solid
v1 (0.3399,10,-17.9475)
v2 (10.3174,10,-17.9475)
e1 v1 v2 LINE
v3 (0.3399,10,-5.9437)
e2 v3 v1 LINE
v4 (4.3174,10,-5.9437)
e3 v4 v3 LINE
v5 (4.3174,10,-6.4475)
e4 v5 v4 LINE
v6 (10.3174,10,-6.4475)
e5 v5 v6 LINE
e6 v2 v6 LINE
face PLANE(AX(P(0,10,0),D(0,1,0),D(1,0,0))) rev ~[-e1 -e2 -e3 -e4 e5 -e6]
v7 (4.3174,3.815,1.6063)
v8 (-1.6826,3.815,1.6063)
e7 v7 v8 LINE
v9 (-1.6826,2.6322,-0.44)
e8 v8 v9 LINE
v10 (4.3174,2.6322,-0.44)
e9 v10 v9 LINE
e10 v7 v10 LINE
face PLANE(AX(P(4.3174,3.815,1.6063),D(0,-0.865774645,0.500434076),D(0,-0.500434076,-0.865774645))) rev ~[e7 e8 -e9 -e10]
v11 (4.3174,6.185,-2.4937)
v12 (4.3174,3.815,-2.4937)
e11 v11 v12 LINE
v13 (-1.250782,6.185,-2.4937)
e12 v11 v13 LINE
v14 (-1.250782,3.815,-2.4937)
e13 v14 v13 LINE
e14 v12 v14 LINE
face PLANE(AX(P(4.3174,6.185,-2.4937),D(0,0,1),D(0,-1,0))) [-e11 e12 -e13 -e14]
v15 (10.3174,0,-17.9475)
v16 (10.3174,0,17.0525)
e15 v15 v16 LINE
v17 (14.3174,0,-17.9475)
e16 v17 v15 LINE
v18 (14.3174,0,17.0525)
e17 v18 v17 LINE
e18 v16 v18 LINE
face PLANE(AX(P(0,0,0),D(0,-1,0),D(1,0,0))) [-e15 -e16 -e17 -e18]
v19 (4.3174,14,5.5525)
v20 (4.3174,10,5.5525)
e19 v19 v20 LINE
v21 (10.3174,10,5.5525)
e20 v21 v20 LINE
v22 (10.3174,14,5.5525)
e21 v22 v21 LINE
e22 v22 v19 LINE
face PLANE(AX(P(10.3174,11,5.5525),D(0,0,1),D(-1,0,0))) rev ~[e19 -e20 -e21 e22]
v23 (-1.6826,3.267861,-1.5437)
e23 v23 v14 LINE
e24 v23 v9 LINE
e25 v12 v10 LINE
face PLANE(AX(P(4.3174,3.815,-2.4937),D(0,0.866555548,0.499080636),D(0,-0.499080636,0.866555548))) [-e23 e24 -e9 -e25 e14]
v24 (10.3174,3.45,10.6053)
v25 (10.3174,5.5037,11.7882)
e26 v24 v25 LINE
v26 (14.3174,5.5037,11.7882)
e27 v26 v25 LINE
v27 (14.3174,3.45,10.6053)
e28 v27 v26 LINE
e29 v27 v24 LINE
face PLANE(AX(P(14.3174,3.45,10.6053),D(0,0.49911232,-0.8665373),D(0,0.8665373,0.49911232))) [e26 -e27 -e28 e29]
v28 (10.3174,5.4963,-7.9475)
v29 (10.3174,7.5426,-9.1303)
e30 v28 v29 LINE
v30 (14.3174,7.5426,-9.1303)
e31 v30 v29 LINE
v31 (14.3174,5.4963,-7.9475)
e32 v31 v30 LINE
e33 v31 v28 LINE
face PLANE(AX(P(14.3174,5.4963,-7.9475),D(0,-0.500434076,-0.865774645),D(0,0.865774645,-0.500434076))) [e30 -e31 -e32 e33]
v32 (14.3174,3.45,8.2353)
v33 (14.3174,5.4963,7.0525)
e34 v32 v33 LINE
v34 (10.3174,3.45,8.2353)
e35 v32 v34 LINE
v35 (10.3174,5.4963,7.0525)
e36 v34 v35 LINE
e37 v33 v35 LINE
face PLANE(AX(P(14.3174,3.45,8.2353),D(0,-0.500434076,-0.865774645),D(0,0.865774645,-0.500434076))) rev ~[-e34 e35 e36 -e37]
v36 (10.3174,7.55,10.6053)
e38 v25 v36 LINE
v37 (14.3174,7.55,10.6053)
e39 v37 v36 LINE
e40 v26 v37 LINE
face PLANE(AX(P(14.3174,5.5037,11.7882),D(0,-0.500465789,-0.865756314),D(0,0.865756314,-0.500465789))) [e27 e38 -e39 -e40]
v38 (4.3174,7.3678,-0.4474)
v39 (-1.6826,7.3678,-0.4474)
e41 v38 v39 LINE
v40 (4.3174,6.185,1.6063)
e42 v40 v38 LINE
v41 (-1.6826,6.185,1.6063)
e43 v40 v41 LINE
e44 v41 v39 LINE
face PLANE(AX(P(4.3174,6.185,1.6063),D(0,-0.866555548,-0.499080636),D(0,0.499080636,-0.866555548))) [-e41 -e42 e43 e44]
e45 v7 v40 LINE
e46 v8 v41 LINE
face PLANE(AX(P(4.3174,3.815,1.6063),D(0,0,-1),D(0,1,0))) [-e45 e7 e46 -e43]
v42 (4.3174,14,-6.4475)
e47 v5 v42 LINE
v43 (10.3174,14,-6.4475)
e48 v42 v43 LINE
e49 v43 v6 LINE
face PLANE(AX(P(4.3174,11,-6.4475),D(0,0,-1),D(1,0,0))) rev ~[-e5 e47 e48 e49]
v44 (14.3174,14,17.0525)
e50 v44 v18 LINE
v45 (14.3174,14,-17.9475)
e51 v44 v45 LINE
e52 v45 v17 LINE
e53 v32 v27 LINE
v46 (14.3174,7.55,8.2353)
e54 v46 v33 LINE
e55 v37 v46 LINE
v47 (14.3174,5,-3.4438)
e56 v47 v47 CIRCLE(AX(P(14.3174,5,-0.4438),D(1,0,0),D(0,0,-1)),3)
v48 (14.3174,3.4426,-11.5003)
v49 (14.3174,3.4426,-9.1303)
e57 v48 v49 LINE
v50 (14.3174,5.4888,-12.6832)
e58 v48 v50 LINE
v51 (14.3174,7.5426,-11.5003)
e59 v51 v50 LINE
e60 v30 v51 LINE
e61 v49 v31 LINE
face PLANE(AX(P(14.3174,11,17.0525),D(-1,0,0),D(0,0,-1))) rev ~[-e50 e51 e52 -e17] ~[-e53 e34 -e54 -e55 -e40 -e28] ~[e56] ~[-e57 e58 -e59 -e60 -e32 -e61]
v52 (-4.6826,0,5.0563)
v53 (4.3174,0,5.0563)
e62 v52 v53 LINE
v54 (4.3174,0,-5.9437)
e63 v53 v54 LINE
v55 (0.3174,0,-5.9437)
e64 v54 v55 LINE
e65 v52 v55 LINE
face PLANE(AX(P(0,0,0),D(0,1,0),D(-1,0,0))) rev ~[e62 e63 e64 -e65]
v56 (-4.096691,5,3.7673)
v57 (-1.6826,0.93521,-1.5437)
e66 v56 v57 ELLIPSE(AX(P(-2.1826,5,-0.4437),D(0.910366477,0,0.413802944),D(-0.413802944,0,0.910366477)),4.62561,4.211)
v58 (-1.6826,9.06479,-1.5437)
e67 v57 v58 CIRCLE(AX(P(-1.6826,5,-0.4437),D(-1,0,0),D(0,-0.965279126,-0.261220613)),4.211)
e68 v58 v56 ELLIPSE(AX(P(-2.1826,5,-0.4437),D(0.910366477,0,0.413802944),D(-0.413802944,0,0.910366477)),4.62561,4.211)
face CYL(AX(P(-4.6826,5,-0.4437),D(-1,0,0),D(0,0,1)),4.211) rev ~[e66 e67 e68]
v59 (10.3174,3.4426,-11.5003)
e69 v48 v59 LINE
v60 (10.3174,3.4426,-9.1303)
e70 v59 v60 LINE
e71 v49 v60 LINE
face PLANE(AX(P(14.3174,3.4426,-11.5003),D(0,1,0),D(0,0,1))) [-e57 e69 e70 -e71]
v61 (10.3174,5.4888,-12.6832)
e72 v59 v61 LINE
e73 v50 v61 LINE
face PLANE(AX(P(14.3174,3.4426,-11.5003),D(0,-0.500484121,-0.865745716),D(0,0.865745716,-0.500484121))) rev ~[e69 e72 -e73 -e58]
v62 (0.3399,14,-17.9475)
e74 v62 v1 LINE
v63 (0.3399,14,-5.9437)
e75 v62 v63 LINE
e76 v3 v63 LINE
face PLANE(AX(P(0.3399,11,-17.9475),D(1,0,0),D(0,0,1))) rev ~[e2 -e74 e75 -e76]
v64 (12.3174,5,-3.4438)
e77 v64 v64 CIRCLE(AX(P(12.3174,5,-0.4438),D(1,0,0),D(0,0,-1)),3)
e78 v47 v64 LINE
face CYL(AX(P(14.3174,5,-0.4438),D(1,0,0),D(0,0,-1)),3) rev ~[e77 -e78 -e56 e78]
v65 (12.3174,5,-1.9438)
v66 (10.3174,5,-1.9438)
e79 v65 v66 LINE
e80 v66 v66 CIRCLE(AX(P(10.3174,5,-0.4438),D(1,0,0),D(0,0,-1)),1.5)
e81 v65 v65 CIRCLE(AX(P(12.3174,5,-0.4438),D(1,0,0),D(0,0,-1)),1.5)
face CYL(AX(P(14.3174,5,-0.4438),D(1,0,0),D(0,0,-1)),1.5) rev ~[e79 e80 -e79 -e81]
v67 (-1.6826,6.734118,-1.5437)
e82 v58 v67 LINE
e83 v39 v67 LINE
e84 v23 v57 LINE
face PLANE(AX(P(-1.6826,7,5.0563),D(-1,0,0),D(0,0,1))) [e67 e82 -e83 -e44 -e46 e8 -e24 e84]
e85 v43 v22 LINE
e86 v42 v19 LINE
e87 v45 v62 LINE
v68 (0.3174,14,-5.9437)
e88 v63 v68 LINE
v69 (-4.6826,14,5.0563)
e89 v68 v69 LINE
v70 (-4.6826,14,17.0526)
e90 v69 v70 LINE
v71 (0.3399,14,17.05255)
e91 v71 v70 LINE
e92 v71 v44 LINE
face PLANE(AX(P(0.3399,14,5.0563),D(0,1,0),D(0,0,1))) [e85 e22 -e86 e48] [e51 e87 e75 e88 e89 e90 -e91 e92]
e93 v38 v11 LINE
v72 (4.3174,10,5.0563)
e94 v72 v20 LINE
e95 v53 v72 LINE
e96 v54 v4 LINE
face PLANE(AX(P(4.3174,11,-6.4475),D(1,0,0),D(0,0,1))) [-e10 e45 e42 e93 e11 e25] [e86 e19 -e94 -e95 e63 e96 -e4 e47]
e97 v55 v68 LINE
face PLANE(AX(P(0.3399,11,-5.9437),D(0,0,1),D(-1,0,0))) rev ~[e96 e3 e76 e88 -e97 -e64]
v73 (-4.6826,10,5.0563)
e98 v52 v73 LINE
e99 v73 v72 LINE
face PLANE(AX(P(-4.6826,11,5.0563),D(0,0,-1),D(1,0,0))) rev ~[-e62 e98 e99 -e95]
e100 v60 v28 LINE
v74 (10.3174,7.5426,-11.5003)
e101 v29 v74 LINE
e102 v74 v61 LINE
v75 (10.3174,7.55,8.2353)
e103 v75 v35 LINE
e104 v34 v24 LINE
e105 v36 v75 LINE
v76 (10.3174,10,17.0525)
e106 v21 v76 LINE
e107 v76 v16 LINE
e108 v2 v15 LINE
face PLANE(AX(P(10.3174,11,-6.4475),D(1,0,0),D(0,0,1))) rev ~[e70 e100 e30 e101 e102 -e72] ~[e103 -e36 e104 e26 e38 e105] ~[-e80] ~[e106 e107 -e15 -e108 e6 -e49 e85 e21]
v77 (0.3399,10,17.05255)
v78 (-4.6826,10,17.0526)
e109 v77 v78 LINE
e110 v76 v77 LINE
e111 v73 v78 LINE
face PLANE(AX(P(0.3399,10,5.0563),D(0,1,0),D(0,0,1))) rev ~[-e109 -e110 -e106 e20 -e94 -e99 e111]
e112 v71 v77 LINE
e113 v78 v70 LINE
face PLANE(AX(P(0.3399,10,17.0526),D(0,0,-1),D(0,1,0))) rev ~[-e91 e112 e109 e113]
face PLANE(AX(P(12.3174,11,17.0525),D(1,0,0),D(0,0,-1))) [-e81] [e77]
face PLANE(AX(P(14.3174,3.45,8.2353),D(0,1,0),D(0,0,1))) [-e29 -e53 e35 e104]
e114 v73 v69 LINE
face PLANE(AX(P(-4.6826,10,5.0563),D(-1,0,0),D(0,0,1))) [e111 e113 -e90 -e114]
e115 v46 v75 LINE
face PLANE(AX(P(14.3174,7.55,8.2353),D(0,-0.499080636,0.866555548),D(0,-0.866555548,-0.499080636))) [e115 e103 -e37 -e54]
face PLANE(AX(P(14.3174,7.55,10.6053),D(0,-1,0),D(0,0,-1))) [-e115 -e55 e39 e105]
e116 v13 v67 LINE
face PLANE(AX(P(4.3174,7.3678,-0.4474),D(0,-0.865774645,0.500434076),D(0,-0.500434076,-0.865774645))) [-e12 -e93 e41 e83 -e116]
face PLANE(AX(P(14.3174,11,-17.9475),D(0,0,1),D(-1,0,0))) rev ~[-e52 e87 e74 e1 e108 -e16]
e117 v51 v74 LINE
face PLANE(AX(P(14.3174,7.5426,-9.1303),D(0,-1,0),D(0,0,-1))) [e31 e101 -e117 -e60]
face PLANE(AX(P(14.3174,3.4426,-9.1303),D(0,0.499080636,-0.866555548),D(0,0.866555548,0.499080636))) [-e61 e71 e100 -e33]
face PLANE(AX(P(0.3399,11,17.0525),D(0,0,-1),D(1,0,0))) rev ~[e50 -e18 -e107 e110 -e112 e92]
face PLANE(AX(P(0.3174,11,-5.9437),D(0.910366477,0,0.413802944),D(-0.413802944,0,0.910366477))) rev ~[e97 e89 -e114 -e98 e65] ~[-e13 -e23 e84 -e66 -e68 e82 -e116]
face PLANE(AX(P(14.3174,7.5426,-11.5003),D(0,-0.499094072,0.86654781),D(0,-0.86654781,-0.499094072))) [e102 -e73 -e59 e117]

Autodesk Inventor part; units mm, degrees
ref_plane "YZ Plane" through (0, 0, 0) normal (1, 0, 0) x (0, 1, 0)
ref_plane "XZ Plane" through (0, 0, 0) normal (0, 1, 0) x (-1, 0, 0)
ref_plane "XY Plane" through (0, 0, 0) normal (0, 0, 1) x (1, 0, 0)
sketch "Sketch1" plane through (0, 0, 0) normal (0, 1, 0) x (-1, 0, 0)
  line L0 (4.6826, 5.0563) -> (-4.3174, 5.0563)
  line L1 (-4.3174, 5.0563) -> (-4.3174, -5.9437)
  line L2 (-4.3174, -5.9437) -> (-0.3174, -5.9437)
  line L3 (4.6826, 5.0563) -> (-0.3174, -5.9437)
  point P0 (0, 0)
  dimension "d0" = 11
  dimension "d1" = 9
  dimension "d2" = 4
extrude "Extrusion1" add sketch "Sketch1" along normal blind 10
sketch "Sketch2" plane through (4.3174, 0, 5.0563) normal (1, 0, 0) x (0, 0, -1)
  line L0 (5.5037, 7.3678) -> (7.55, 3.815)
  line L1 (7.55, 3.815) -> (5.4963, 2.6322)
  line L2 (5.4963, 2.6322) -> (3.45, 6.185)
  line L3 (3.45, 6.185) -> (5.5037, 7.3678)
  line L4 (3.45, 6.185) -> (7.55, 6.185)
  line L5 (7.55, 6.185) -> (7.55, 3.815)
  line L6 (7.55, 3.815) -> (3.45, 3.815)
  line L7 (3.45, 3.815) -> (3.45, 6.185)
  line L8 (5.5037, 7.3678) -> (7.55, 6.185)
  line L9 (3.45, 3.815) -> (5.4963, 2.6322)
  line L10 (0, 0) -> (11, 0) projected
  line L11 (11, 0) -> (11, 10) projected
  line L12 (0, 10) -> (11, 10) projected
  line L13 (0, 0) -> (0, 10) projected
  line L14 (3.45, 6.185) -> (7.55, 3.815)
  line L15 (3.45, 3.815) -> (7.55, 6.185)
  line L16 (5.5037, 7.3678) -> (5.4963, 2.6322)
  point P0 (5.0563, 0)
  point P1 (11, 0)
  point P2 (5.5, 5)
  dimension "d6" = 4.1
  dimension "d7" = 2.37
  dimension "d8" = 4.1
  dimension "d9" = 2.37
  dimension "d11" = 5
  dimension "d12" = 5.5
extrude "Extrusion2" cut sketch "Sketch2" against normal through all contours L8 L4 L0 | L16 L4 L3 | L0 L4 L16 | L4 L15 L0 | L0 L15 L16 L4 | L14 L15 L2 | L2 L15 L7 | L4 L16 L14 | L5 L0 L15 | L0 L14 L15 | L15 L16 L6 L2 | L2 L6 L15 | L6 L2 L9 | L14 L6 L16 | L1 L16 L6 | L6 L16 L2
sketch "Sketch3" plane through (0, 10, 0) normal (0, 1, 0) x (1, 0, 0)
  line L0 (-4.6826, -5.0563) -> (4.3174, -5.0563) projected
  line L1 (4.3174, -5.0563) -> (4.3174, 5.9437) projected
  line L2 (4.3174, 5.9437) -> (0.3174, 5.9437) projected
  line L3 (0.3174, 5.9437) -> (-4.6826, -5.0563) projected
  line L4 (0.3399, 17.9475) -> (4.3174, 17.9475)
  line L5 (4.3174, 17.9475) -> (4.3174, -17.0525)
  line L6 (4.3174, -17.0525) -> (0.3399, -17.0525)
  line L7 (0.3399, -17.0525) -> (0.3399, 17.9475)
  line L8 (4.3174, -1.6063) -> (-3.1144, -1.6063) projected
  line L9 (4.3174, 2.4937) -> (-1.2508, 2.4937) projected
  line L10 (4.3174, 0.4475) -> (-2.1809, 0.4475) projected
  line L11 (4.3174, 17.9475) -> (14.3174, 17.9475)
  line L12 (14.3174, 17.9475) -> (14.3174, -17.0525)
  line L13 (14.3174, -17.0525) -> (4.3174, -17.0525)
  line L14 (4.3174, -17.0525) -> (4.3174, 17.9475)
  line L15 (4.3174, 6.4475) -> (10.3174, 6.4475)
  line L16 (10.3174, 6.4475) -> (10.3174, -5.5525)
  line L17 (10.3174, -5.5525) -> (4.3174, -5.5525)
  line L18 (4.3174, -5.5525) -> (4.3174, 6.4475)
  point P0 (0, 0)
  dimension "d15" = 35
  dimension "d16" = 17.5
  dimension "d17" = 10
  dimension "d18" = 6
  dimension "d19" = 6
  dimension "d20" = 12
extrude "Extrusion3" add sketch "Sketch3" along normal blind 1 contours L3 L8 L7 L0 | L7 L8 L1 L0 | L0 L5 L6 L7 | L3 L10 L7 L8 | L7 L10 L1 L8 | L3 L9 L7 L10 | L17 L16 L15 L5 L11 L12 L13 | L7 L9 L1 L10 | L3 L2 L7 L9 | L7 L2 L1 L9 | L7 L4 L5 L2
sketch "Sketch4" plane through (0, 10, 0) normal (0, -1, 0) x (1, 0, 0)
  line L0 (4.3174, -5.9437) -> (0.3399, -5.9437) projected
  line L1 (0.3399, -17.9475) -> (0.3399, -5.9437) projected
  line L2 (14.3174, -17.9475) -> (0.3399, -17.9475) projected
  line L3 (14.3174, 17.0525) -> (14.3174, -17.9475) projected
  line L4 (0.3399, 17.0525) -> (14.3174, 17.0525) projected
  line L5 (0.3399, 5.0563) -> (0.3399, 17.0525) projected
  line L6 (0.3399, 5.0563) -> (4.3174, 5.0563) projected
  line L7 (4.3174, 5.0563) -> (4.3174, 5.5525) projected
  line L8 (4.3174, 5.5525) -> (10.3174, 5.5525) projected
  line L9 (10.3174, 5.5525) -> (10.3174, -6.4475) projected
  line L10 (10.3174, -6.4475) -> (4.3174, -6.4475) projected
  line L11 (4.3174, -6.4475) -> (4.3174, -5.9437) projected
  line L12 (0.3399, 17.0525) -> (14.3174, 17.0525) projected
  line L13 (14.3174, -17.9475) -> (10.3174, -17.9475)
  line L14 (10.3174, -17.9475) -> (10.3174, 17.0525)
  line L15 (10.3174, 17.0525) -> (14.3174, 17.0525)
  line L16 (14.3174, 17.0525) -> (14.3174, -17.9475)
  point P0 (0, 0)
  dimension "d23" = 4
extrude "Extrusion4" add sketch "Sketch4" along normal blind 10 contours L9 L14 L4 L3 L2
sketch "Sketch5" plane through (14.3174, 11, 17.0525) normal (1, 0, 0) x (0, 0, -1)
  line L0 (5.2643, -5.4963) -> (8.8172, -3.45)
  line L1 (8.8172, -3.45) -> (10, -5.5037)
  line L2 (10, -5.5037) -> (6.4472, -7.55)
  line L3 (6.4472, -7.55) -> (5.2643, -5.4963)
  line L4 (6.4472, -7.55) -> (6.4472, -3.45)
  line L5 (6.4472, -3.45) -> (8.8172, -3.45)
  line L6 (8.8172, -3.45) -> (8.8172, -7.55)
  line L7 (8.8172, -7.55) -> (6.4472, -7.55)
  line L8 (5.2643, -5.4963) -> (6.4472, -3.45)
  line L9 (8.8172, -7.55) -> (10, -5.5037)
  line L10 (19.2733, 12.7) -> (12, 12.7)
  line L11 (25, -5.5037) -> (28.5528, -3.4574)
  line L12 (28.5528, -3.4574) -> (29.7357, -5.5112)
  line L13 (29.7357, -5.5112) -> (26.1828, -7.5574)
  line L14 (26.1828, -7.5574) -> (25, -5.5037)
  line L15 (26.1828, -7.5574) -> (26.1828, -3.4574)
  line L16 (26.1828, -3.4574) -> (28.5528, -3.4574)
  line L17 (28.5528, -3.4574) -> (28.5528, -7.5574)
  line L18 (28.5528, -7.5574) -> (26.1828, -7.5574)
  line L19 (25, -5.5037) -> (26.1828, -3.4574)
  line L20 (28.5528, -7.5574) -> (29.7357, -5.5112)
  line L21 (0, 0) -> (35, 0) projected
  line L22 (0, 0) -> (0, -11) projected
  line L23 (35, -11) -> (35, 0) projected
  line L24 (6.4472, -7.55) -> (8.8172, -3.45)
  line L25 (6.4472, -3.45) -> (8.8172, -7.55)
  line L26 (10, -5.5037) -> (5.2643, -5.4963)
  line L27 (26.1828, -3.4574) -> (28.5528, -7.5574)
  line L28 (26.1828, -7.5574) -> (28.5528, -3.4574)
  line L29 (25, -5.5037) -> (29.7357, -5.5112)
  line L30 (35, -11) -> (35, 0) projected
  line L31 (0, 0) -> (35, 0) projected
  line L32 (0, 0) -> (0, -11) projected
  line L33 (35, -11) -> (0, -11) projected
  line L34 (19.5463, -7.185) -> (17.4926, -8.3678) projected
  line L35 (17.4926, -8.3678) -> (15.4463, -7.185) projected
  line L36 (15.4463, -7.185) -> (15.4463, -4.815) projected
  line L37 (15.4463, -4.815) -> (17.5, -3.6322) projected
  line L38 (17.5, -3.6322) -> (19.5463, -4.815) projected
  line L39 (19.5463, -4.815) -> (19.5463, -7.185) projected
  line L40 (15.4463, -7.185) -> (19.5463, -4.815)
  line L41 (15.4463, -4.815) -> (19.5463, -7.185)
  line L42 (19.5463, -7.185) -> (17.4926, -8.3678)
  line L43 (17.5, -3.6322) -> (17.4926, -8.3678)
  circle A0 centre (17.4963, -6) radius 1.5
  point P0 (17.0525, -11)
  point P1 (11, 0)
  point P2 (7.6322, -5.5)
  point P3 (27.3678, -5.5074)
  dimension "d26" = 4.1
  dimension "d27" = 2.37
  dimension "d28" = 4.1
  dimension "d29" = 2.37
  dimension "d31" = 4.1
  dimension "d32" = 2.37
  dimension "d33" = 4.1
  dimension "d34" = 2.37
  dimension "d36" = 10
  dimension "d37" = 10
  dimension "d38" = 5.5
  dimension "d39" = 3
extrude "Extrusion5" cut sketch "Sketch5" against normal up to surface (4 mm away) contours L8 L4 L0 | L26 L4 L3 | L0 L4 L26 | L4 L25 L0 | L0 L25 L26 L4 | L24 L25 L2 | L2 L25 L7 | L4 L26 L24 | L5 L0 L25 | L0 L24 L25 | L25 L26 L6 L2 | L2 L6 L25 | L6 L2 L9 | L24 L6 L26 | L1 L26 L6 | L6 L26 L2 | L19 L15 L11 | L29 L15 L14 | L11 L15 L29 | L15 L27 L11 | L11 L27 L29 L15 | L28 L27 L13 | L13 L27 L18 | L15 L29 L28 | L16 L11 L27 | L11 L28 L27 | L27 L29 L17 L13 | L13 L17 L27 | L17 L13 L20 | L28 L17 L29 | L12 L29 L17 | L17 L29 L13 | A0 L43 L41 | L41 L40 A0 | A0 L40 L43 | L40 L43 A0 | L40 A0 L41 | L41 A0 L43
sketch "Sketch6" plane through (14.3174, 11, 17.0525) normal (1, 0, 0) x (0, 0, -1)
  circle A0 centre (17.4963, -6) radius 1.5 projected
  circle A1 centre (17.4963, -6) radius 3
  point P0 (17.0525, -11)
  dimension "d42" = 6
extrude "Extrusion6" cut sketch "Sketch6" against normal blind 2
sketch "Sketch7" plane through (0, 11, 0) normal (0, 1, 0) x (1, 0, 0)
  line L0 (4.3174, 6.4475) -> (4.3174, -5.5525) projected
  line L1 (4.3174, 6.4475) -> (10.3174, 6.4475) projected
  line L2 (10.3174, 6.4475) -> (10.3174, -5.5525) projected
  line L3 (10.3174, -5.5525) -> (4.3174, -5.5525) projected
  line L4 (0.3399, 5.9437) -> (0.3174, 5.9437) projected
  line L5 (0.3174, 5.9437) -> (-4.6826, -5.0563) projected
  line L6 (-4.6826, -5.0563) -> (0.3399, -5.0563) projected
  line L7 (0.3399, -5.0563) -> (0.3399, -17.0525) projected
  line L8 (0.3399, -17.0525) -> (14.3174, -17.0525) projected
  line L9 (14.3174, -17.0525) -> (14.3174, 17.9475) projected
  line L10 (14.3174, 17.9475) -> (0.3399, 17.9475) projected
  line L11 (0.3399, 17.9475) -> (0.3399, 5.9437) projected
  point P0 (0, 0)
extrude "Extrusion7" add sketch "Sketch7" along normal blind 3
ref_plane "Work Plane1" through (-4.6826, 7, 5.0563) normal (-1, 0, 0) x (0, 0, 1)
sketch "Sketch8" plane through (-4.6826, 7, 5.0563) normal (-1, 0, 0) x (0, 0, 1)
  circle A0 centre (-5.5, -2) radius 3 projected
  circle A1 centre (-5.5, -2) radius 4.211
  point P0 (-5.0563, -7)
extrude "Extrusion8" cut sketch "Sketch8" against normal blind 3 contours A0 | A1
sketch "Sketch9" plane through (0.3399, 10, 5.0563) normal (-1, 0, 0) x (0, 0, 1)
  line L0 (0, 0) -> (0, 4) projected
  line L1 (0, 0) -> (11.9963, 0) projected
  line L2 (11.9963, 0) -> (11.9963, 4) projected
  line L3 (0, 4) -> (11.9963, 4) projected
  point P0 (-5.0563, -10)
extrude "Extrusion9" add sketch "Sketch9" along normal up to surface (5.0225 mm away)
equation "\"d16\" = 0.5 * d15"
properties part number "world_cam_mount"
